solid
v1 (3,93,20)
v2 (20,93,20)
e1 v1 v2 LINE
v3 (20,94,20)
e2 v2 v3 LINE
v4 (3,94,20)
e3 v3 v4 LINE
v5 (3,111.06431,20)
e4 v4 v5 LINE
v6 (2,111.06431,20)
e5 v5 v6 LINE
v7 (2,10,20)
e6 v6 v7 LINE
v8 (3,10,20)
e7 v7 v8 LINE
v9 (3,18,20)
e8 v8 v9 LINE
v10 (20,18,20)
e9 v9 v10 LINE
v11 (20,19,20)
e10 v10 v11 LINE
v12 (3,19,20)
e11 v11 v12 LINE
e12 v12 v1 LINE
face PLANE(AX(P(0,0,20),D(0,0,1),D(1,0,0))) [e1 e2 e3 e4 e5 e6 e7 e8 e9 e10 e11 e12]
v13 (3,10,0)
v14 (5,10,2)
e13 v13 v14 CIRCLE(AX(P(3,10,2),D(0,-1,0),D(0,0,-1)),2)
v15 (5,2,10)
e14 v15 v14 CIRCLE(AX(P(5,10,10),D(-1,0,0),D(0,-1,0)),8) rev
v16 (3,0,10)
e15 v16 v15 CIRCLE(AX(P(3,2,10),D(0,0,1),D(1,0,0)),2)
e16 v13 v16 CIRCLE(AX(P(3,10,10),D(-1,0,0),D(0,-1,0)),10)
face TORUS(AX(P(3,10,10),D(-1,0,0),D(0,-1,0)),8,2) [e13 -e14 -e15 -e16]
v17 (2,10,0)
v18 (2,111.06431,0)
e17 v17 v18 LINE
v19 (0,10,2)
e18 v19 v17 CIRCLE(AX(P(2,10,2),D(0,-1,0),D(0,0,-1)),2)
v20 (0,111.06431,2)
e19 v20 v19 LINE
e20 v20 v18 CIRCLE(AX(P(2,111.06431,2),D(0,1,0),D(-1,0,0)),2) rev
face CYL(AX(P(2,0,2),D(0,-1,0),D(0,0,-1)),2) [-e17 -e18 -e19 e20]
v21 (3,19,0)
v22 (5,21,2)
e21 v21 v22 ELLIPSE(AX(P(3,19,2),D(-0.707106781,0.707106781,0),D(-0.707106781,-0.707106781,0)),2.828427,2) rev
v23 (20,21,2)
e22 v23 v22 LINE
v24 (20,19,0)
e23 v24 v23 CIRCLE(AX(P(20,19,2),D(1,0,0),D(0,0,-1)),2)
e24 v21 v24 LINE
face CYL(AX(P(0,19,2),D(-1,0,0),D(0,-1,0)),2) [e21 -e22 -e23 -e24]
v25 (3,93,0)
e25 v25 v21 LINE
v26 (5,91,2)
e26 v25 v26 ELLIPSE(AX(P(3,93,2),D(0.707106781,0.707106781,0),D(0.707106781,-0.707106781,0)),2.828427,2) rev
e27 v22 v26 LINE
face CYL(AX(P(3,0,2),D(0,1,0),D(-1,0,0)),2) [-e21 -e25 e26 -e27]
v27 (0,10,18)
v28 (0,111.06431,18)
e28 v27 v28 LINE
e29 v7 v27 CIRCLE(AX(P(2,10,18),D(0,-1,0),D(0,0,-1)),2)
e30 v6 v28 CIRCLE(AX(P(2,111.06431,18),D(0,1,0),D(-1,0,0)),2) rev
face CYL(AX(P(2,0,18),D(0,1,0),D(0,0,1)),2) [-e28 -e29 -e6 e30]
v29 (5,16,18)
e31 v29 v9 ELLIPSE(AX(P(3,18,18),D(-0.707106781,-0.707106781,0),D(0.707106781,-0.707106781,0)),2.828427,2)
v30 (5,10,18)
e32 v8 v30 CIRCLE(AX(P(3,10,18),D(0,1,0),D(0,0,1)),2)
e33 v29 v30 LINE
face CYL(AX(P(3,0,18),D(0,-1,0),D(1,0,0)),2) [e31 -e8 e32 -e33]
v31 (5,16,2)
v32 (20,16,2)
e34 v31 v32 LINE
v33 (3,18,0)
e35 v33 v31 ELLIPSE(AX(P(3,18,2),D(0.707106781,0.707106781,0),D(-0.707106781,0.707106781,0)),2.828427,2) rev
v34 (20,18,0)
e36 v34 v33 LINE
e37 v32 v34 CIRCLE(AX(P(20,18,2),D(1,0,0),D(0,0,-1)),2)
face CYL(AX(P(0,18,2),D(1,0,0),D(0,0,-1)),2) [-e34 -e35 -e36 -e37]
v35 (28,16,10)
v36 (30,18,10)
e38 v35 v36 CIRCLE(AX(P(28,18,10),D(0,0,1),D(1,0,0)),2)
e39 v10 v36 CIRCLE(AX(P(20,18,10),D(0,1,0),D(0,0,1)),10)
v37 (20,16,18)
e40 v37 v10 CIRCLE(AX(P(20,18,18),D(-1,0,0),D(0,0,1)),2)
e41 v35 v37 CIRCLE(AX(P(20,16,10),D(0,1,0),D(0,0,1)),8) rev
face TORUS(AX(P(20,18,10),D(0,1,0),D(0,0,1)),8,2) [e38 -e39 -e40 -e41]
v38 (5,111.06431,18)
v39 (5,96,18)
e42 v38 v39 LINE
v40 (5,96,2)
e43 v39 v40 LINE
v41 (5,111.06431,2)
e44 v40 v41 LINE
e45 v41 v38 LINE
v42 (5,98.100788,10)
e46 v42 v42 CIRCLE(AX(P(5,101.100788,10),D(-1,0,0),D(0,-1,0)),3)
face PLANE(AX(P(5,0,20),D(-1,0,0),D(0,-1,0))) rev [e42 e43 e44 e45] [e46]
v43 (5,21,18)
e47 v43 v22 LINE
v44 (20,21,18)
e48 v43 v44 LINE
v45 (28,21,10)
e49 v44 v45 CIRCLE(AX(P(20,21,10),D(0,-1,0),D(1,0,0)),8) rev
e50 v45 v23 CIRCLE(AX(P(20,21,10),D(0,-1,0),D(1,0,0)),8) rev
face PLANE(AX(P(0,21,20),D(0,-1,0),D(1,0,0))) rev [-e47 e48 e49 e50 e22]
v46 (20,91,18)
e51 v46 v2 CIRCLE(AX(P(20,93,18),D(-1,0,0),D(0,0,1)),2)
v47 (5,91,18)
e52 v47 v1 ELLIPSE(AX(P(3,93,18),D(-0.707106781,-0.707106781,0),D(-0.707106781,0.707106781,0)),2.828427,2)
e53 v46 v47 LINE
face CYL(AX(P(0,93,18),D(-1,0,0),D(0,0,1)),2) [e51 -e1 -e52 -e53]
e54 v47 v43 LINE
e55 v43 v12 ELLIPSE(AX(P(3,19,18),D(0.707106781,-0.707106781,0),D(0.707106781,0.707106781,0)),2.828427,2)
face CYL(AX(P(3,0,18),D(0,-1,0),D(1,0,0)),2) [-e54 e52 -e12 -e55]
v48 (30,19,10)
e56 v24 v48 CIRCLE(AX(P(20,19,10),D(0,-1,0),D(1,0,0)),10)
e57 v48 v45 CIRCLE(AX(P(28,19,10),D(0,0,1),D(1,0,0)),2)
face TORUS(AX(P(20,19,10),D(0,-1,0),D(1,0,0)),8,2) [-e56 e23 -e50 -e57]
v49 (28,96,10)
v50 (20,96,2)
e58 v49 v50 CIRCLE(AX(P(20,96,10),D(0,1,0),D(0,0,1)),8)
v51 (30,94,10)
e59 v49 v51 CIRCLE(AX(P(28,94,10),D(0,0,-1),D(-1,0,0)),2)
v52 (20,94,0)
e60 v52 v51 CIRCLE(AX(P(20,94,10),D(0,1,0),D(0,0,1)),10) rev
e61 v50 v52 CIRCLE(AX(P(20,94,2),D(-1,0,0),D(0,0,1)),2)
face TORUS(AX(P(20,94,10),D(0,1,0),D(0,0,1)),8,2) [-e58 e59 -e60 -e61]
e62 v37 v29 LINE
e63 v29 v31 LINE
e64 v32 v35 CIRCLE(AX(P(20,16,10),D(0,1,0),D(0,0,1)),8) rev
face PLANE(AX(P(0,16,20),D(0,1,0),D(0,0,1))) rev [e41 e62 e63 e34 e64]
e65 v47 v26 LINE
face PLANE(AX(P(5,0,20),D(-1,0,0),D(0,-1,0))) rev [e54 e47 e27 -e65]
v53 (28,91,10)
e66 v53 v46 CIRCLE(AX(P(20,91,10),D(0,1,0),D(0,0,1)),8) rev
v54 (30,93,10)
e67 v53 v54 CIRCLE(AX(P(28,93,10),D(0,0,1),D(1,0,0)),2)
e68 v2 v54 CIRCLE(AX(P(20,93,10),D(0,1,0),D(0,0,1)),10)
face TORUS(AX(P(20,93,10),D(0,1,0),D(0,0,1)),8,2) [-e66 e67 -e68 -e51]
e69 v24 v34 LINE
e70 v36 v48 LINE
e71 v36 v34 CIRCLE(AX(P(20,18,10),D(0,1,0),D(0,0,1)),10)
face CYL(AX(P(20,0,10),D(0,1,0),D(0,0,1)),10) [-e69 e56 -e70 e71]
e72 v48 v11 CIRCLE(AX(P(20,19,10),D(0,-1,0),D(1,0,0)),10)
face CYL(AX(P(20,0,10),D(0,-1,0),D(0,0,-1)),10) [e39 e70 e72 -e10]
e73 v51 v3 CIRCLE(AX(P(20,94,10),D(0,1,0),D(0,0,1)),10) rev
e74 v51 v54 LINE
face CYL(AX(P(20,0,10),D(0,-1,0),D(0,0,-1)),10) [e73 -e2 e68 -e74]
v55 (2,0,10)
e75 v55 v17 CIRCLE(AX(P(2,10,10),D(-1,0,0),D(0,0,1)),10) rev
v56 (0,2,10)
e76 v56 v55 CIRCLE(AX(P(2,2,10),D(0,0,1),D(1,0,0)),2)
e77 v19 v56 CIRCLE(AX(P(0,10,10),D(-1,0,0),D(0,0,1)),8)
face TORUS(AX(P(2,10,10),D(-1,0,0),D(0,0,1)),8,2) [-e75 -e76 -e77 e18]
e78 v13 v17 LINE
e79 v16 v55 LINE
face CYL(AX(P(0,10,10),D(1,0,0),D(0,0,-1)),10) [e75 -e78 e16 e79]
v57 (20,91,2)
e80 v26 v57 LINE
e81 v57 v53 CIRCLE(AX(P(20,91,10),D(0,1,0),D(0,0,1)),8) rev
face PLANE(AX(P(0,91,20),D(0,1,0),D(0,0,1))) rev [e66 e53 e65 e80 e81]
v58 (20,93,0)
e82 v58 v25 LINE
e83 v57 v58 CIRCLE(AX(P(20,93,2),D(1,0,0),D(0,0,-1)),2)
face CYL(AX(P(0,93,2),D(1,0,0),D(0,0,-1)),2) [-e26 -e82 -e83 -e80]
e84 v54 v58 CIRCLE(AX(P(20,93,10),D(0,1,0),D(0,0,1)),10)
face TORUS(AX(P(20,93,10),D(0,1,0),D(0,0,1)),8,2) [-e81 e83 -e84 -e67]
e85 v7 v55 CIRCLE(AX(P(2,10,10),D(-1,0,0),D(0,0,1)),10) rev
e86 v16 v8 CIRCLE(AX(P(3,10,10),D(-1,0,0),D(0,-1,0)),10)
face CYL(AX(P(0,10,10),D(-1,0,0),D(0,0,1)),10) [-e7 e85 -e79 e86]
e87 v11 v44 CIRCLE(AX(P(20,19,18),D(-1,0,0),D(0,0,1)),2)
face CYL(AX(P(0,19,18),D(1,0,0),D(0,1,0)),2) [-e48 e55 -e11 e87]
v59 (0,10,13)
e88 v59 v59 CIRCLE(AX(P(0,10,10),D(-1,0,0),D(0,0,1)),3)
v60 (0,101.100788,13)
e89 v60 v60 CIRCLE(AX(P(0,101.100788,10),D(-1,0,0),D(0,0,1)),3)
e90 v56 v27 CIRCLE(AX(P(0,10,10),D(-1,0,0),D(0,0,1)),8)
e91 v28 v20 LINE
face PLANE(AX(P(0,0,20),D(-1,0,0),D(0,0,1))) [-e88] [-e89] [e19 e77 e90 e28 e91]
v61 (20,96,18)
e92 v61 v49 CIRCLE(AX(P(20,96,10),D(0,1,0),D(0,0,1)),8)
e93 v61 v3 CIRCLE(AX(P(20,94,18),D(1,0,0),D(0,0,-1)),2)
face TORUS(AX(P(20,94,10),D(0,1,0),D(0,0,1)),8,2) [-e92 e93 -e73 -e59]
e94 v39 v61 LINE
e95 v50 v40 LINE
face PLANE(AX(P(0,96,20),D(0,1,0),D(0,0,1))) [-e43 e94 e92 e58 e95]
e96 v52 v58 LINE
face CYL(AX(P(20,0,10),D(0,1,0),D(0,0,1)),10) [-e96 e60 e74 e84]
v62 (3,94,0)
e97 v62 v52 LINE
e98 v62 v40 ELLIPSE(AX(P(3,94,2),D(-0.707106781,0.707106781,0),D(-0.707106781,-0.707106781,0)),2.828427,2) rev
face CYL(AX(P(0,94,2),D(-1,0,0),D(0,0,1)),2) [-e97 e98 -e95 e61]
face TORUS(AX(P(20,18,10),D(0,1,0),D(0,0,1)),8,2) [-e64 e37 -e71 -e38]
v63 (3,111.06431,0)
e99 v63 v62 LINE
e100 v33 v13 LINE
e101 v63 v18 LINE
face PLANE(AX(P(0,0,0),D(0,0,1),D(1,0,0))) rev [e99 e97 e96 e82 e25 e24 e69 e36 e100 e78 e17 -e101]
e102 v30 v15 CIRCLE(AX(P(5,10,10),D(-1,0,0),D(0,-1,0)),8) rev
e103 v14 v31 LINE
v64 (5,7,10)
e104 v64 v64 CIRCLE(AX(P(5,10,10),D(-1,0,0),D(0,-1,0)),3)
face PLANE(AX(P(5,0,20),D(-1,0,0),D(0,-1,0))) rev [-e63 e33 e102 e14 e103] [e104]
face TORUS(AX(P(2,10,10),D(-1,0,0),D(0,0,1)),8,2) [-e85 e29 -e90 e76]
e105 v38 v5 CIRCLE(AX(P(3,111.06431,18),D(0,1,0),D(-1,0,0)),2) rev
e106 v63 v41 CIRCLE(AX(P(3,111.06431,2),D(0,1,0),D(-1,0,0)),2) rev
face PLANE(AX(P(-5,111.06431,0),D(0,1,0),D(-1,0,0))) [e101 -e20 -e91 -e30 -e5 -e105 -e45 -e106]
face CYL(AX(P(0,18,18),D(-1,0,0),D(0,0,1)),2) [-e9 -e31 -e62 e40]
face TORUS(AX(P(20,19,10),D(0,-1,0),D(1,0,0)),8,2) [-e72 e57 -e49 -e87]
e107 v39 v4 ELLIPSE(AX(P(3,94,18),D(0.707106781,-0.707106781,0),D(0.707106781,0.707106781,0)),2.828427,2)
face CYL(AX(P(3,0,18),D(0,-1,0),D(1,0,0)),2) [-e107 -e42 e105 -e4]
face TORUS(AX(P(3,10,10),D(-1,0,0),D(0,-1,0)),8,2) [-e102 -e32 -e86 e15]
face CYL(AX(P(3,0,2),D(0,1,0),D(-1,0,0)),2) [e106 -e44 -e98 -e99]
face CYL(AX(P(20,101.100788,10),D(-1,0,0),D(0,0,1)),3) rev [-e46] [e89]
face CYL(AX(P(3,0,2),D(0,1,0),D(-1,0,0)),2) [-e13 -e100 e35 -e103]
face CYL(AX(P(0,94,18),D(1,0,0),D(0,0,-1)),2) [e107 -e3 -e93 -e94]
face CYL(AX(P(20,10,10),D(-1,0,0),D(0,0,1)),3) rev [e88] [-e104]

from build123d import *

# Parameters (mm, degrees)
BOSS_EXTRUDE1_DEPTH = 20
SKETCH2_R           = 3
CUT_EXTRUDE1_DEPTH  = 20
FILLET1_R           = 10
FILLET2_R           = 2
CUT_EXTRUDE2_DEPTH  = 10


with BuildPart() as part:
    # Sketch1 → Boss-Extrude1 (new body)
    with BuildSketch(Plane.XY):
        Polygon((0, 0), (5, 0), (5, 10), (5, 16), (30, 16), (30, 21), (5, 21), (5, 91), (30, 91), (30, 96), (5, 96), (5, 170), (0, 170), align=None)
    extrude(amount=BOSS_EXTRUDE1_DEPTH)

    # Sketch2 → Cut-Extrude1 (cut)
    with BuildSketch(Plane.ZY):
        with Locations((10, 10)):
            Circle(SKETCH2_R)
        with Locations((10, 101.100788163)):
            Circle(SKETCH2_R)
    extrude(amount=-CUT_EXTRUDE1_DEPTH, mode=Mode.SUBTRACT)

    # Fillet1
    fillet1_edges = [part.edges().sort_by_distance(p)[0] for p in [
        (2.5, 170, 20),
        (2.5, 170, 0),
        (2.5, 0, 0),
        (2.5, 0, 20),
        (30, 18.5, 20),
        (30, 18.5, 0),
        (30, 93.5, 0),
        (30, 93.5, 20),
    ]]
    fillet(fillet1_edges, radius=FILLET1_R - 0.0001)  # a hair under: the kernel refuses the full size

    # Fillet2
    fillet2_edges = [part.edges().sort_by_distance(p)[0] for p in [
        (5, 56, 0),
        (12.50005, 16, 0),
        (12.50005, 96, 20),
        (5, 128.00005, 0),
        (12.50005, 96, 0),
        (12.50005, 91, 0),
        (5, 128.00005, 20),
        (12.50005, 16, 20),
        (5, 167.071097101, 2.928902899),
        (5, 167.071097101, 17.071097101),
        (0, 85, 20),
        (5, 12.99995, 20),
        (12.50005, 21, 20),
        (0, 85, 0),
        (0, 2.928902899, 17.071097101),
        (0, 2.928902899, 2.928902899),
        (0, 167.071097101, 2.928902899),
        (0, 167.071097101, 17.071097101),
        (12.50005, 91, 20),
        (12.50005, 21, 0),
        (5, 12.99995, 0),
        (5, 2.928902899, 17.071097101),
        (5, 56, 20),
        (5, 2.928902899, 2.928902899),
        (27.071097101, 21, 2.928902899),
        (27.071097101, 21, 17.071097101),
        (27.071097101, 16, 2.928902899),
        (27.071097101, 16, 17.071097101),
        (27.071097101, 96, 17.071097101),
        (27.071097101, 96, 2.928902899),
        (27.071097101, 91, 17.071097101),
        (27.071097101, 91, 2.928902899),
    ]]
    fillet(fillet2_edges, radius=FILLET2_R)

    # Sketch3 → Cut-Extrude2 (cut)
    with BuildSketch(Plane(origin=(5, 0, 0), x_dir=(0, 0, -1), z_dir=(1, 0, 0))):
        with BuildLine():
            Line((-2, 111.064309568), (0, 111.064309568))
            Line((0, 111.064309568), (5.411818178, 111.064309568))
            Line((5.411818178, 111.064309568), (5.411818178, 180.556551252))
            Line((5.411818178, 180.556551252), (-29.02399195, 180.556551252))
            Line((-29.02399195, 180.556551252), (-29.02399195, 111.064309568))
            Line((-29.02399195, 111.064309568), (-20, 111.064309568))
            Line((-20, 111.064309568), (-18, 111.064309568))
            Line((-18, 111.064309568), (-18, 160))
            ThreePointArc((-18, 160), (-15.656854249, 165.656854249), (-10, 168))
            ThreePointArc((-10, 168), (-4.343145751, 165.656854249), (-2, 160))
            Line((-2, 160), (-2, 111.064309568))
        make_face()
        with BuildLine():
            Line((-18, 111.064309568), (-2, 111.064309568))
            Line((-2, 111.064309568), (-2, 160))
            ThreePointArc((-2, 160), (-4.343145751, 165.656854249), (-10, 168))
            ThreePointArc((-10, 168), (-15.656854249, 165.656854249), (-18, 160))
            Line((-18, 160), (-18, 111.064309568))
        make_face()
    extrude(amount=-CUT_EXTRUDE2_DEPTH, mode=Mode.SUBTRACT)


solid = part.part
